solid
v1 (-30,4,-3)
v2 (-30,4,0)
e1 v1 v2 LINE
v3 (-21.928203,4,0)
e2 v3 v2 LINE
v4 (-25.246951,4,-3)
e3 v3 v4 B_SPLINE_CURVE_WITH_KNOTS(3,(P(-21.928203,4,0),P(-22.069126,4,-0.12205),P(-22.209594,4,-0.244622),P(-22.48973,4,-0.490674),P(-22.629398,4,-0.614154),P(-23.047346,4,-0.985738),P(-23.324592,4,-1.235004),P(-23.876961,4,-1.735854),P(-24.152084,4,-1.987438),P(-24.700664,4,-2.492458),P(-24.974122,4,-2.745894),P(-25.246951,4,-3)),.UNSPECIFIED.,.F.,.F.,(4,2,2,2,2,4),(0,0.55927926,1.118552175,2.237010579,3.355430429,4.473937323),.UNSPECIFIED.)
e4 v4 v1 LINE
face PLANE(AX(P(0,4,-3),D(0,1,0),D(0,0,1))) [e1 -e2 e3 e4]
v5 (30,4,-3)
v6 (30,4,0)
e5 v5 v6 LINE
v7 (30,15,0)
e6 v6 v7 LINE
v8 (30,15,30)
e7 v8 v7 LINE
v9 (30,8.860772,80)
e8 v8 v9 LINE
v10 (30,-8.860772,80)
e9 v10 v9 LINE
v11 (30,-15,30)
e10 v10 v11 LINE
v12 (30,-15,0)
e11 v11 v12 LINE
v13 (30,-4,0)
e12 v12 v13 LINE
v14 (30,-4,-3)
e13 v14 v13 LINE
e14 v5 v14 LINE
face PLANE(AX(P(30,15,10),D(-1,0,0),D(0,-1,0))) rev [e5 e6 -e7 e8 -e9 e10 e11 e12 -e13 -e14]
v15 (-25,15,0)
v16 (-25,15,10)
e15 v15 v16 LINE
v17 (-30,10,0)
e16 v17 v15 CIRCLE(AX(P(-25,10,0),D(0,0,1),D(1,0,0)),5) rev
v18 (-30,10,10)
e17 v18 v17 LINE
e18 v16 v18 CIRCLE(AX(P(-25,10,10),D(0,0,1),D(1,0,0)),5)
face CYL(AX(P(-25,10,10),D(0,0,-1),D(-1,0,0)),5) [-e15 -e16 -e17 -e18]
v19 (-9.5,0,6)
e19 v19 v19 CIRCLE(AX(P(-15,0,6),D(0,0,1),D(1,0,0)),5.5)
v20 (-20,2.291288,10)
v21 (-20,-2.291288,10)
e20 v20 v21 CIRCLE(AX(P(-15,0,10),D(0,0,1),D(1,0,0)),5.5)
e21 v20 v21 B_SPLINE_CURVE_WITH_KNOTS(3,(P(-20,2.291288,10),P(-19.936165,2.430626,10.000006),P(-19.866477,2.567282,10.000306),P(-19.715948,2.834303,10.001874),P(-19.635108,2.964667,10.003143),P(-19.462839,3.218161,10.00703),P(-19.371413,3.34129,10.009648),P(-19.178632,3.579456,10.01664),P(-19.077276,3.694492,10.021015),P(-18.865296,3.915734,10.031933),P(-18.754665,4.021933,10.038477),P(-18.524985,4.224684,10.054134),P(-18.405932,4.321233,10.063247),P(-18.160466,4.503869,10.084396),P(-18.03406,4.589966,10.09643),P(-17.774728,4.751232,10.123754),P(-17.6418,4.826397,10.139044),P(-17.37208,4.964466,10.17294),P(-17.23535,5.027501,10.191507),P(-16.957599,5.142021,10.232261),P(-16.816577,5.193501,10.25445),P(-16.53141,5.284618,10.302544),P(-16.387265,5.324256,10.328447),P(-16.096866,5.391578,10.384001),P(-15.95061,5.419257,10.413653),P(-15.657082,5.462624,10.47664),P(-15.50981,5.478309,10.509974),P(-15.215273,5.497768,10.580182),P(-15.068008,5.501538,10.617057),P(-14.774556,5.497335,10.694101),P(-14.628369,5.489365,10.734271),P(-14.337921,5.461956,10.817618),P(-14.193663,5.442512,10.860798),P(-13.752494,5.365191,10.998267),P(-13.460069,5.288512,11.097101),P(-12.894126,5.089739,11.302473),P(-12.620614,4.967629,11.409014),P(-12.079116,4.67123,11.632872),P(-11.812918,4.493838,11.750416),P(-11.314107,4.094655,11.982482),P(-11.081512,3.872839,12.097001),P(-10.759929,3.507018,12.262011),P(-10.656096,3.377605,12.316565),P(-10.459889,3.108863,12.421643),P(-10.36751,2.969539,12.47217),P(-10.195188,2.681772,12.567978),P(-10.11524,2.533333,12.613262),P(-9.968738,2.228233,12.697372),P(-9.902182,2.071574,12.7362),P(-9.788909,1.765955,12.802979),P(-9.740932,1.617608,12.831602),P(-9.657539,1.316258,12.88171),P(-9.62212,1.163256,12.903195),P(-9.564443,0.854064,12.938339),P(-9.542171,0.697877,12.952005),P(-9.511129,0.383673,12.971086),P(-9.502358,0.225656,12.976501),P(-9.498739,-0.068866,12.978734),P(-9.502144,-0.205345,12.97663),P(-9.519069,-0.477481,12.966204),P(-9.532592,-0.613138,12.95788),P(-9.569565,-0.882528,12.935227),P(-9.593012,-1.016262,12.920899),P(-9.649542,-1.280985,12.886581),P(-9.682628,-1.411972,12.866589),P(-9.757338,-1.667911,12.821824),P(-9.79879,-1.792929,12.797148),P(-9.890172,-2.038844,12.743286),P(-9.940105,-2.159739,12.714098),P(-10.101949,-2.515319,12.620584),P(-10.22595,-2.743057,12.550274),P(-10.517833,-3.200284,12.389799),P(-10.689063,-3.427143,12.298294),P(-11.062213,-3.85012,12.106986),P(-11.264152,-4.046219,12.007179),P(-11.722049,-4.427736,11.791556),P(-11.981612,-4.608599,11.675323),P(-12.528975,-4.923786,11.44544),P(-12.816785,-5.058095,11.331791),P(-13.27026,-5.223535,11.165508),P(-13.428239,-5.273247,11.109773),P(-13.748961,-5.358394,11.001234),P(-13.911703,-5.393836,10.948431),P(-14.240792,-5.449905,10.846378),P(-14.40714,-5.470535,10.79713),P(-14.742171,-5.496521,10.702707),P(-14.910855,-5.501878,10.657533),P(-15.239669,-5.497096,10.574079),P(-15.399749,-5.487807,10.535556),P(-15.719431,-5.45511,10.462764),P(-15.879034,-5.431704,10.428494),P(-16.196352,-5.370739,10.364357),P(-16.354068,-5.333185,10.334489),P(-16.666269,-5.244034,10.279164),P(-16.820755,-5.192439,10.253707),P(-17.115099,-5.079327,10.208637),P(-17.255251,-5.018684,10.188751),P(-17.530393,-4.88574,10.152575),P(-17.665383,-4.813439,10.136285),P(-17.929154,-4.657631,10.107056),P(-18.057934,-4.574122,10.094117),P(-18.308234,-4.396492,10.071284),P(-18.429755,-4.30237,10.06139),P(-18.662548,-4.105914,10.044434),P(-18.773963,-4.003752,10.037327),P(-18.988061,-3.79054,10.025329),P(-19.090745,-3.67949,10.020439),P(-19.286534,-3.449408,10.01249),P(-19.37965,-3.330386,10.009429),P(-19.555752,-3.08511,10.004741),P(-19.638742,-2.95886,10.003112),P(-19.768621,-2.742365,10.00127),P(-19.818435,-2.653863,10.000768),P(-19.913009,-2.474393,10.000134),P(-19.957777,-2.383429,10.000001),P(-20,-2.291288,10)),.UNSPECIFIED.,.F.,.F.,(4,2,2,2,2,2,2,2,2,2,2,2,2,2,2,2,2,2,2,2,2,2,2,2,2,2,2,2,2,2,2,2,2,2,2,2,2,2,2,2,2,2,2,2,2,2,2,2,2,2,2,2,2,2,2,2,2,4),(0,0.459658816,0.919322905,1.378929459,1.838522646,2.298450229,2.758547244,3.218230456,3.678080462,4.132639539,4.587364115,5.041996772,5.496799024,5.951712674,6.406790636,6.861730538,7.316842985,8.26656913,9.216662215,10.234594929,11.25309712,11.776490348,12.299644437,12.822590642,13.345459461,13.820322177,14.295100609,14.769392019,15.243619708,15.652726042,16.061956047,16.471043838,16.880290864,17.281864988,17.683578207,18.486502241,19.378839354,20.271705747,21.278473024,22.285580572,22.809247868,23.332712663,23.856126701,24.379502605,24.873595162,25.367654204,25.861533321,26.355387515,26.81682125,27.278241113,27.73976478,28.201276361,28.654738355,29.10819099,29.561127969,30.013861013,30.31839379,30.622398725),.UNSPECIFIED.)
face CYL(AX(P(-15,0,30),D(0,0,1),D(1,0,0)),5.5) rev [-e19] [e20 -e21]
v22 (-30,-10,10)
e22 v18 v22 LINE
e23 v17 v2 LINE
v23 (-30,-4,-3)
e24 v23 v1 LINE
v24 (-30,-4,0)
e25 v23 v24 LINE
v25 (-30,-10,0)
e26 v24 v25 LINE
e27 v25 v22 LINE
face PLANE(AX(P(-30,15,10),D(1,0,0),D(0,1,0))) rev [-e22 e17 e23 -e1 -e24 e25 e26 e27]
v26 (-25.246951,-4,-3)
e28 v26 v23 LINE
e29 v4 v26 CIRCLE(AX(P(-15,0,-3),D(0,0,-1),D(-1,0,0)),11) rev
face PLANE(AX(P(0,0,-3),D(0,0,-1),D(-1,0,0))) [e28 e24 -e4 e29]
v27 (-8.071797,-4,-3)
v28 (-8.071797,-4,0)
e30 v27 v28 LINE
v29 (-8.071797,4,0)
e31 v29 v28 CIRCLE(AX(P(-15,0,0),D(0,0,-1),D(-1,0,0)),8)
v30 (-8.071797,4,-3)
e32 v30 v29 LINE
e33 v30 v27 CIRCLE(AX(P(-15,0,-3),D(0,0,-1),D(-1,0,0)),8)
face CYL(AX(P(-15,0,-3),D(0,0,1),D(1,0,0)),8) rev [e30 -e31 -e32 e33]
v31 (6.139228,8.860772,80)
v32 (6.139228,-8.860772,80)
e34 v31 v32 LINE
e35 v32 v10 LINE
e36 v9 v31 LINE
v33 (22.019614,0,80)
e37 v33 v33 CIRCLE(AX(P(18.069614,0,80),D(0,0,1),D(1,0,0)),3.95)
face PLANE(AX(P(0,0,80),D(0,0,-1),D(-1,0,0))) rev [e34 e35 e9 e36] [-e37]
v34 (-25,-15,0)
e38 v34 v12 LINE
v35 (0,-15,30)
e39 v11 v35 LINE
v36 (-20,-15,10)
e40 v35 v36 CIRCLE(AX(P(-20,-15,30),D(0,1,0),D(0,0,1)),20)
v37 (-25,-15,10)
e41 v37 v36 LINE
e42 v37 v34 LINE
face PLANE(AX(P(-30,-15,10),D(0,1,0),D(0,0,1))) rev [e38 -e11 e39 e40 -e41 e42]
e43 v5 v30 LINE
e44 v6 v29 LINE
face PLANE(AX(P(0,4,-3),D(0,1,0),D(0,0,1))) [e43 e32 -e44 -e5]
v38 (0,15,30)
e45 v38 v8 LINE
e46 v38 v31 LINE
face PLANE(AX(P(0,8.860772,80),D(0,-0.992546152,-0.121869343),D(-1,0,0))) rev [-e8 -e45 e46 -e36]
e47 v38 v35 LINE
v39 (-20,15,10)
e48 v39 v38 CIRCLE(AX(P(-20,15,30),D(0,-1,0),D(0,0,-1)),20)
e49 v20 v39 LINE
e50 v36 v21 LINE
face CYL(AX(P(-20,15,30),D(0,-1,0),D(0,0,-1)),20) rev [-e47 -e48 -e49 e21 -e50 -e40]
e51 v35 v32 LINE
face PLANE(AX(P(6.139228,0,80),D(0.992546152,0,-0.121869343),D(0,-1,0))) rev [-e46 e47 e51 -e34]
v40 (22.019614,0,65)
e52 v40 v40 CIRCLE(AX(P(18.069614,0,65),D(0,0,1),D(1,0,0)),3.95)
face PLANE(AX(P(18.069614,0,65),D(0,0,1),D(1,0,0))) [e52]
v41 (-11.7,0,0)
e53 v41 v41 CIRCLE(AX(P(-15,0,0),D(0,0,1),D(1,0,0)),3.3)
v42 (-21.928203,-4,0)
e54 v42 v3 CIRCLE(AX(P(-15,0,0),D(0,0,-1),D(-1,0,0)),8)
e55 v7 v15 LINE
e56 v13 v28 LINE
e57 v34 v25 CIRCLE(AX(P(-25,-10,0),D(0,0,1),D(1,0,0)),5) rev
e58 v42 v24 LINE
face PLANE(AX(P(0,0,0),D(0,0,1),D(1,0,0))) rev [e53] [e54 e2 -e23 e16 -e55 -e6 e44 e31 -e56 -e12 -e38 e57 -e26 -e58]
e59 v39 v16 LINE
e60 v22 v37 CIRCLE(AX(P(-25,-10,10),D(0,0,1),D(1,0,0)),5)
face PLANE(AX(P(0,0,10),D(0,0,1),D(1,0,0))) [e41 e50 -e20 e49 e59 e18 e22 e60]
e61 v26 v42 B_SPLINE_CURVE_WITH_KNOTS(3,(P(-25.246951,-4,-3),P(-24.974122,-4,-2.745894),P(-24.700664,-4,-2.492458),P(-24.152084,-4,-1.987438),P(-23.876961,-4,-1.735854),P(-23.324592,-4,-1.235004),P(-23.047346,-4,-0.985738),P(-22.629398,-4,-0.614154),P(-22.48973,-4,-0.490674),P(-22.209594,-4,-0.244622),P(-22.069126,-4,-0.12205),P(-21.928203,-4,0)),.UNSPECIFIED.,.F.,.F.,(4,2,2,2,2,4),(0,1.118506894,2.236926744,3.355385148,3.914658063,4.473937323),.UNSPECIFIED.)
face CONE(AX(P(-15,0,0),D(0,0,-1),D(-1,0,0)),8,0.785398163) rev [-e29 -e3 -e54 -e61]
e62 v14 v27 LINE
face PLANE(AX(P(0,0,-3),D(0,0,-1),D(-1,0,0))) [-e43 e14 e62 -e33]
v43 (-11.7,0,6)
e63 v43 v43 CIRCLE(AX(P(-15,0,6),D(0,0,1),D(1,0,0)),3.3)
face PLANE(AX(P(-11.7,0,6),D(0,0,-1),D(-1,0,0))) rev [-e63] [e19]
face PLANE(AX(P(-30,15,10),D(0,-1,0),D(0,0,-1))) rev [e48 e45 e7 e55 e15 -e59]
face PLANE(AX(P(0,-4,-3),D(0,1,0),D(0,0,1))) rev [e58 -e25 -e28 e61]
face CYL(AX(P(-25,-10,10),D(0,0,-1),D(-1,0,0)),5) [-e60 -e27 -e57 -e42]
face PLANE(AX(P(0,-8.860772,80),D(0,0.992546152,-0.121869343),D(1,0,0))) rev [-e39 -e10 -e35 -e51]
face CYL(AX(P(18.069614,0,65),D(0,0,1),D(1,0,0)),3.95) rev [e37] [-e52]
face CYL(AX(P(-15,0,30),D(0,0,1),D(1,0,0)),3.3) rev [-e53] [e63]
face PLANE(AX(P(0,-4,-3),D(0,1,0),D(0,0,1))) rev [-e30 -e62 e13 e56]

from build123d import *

# Parameters (mm, degrees)
BASE_DEPTH                    = 10
TOWER_SKETCH_W                = 29.999999999999996
TOWER_SKETCH_H                = 30
TOWER_DEPTH                   = 70
BASE_RADIUS_R                 = 20
BASE_SCREW_D                  = 6.6
BASE_SCREW_CBORE_D            = 11
BASE_SCREW_CBORE_DEPTH        = 24
TOWER_BEVEL_SIZE              = 50
TOWER_BEVEL_SIZE_2            = 6.139228045
TOP_COVER_SCREW_HOLE_SKETCH_R = 3.950000000000002
COVER_SREW_HOLE_DEPTH         = 15
P_IDAT_VYSUNUT_M3_DEPTH       = 3
PROFILE_BEVEL_SIZE            = 3
ROUNDING_R                    = 5


# Some blends are built 0.0001 mm under size
with BuildPart() as part:
    # Base sketch → Base (new body)
    with BuildSketch(Plane.XY):
        Polygon((-30.000000000000007, 15.000000000000002), (29.999999999999986, 15.000000000000002), (29.999999999999993, -14.999999999999998), (-30, -14.999999999999998), align=None)
    extrude(amount=BASE_DEPTH)

    # Tower sketch → Tower (add)
    with BuildSketch(Plane.XY.offset(10)):
        with Locations((14.999999999999988, 1.78e-15)):
            Rectangle(TOWER_SKETCH_W, TOWER_SKETCH_H)
    extrude(amount=TOWER_DEPTH)

    # Base radius
    base_radius_edges = [part.edges().sort_by_distance(p)[0] for p in [
        (-1.041e-14, 1.78e-15, 10),
    ]]
    fillet(base_radius_edges, radius=BASE_RADIUS_R)

    # Base screw (through all)
    with Locations(Plane.XY.offset(30)):
        with Locations((-15, 0)):
            CounterBoreHole(BASE_SCREW_D / 2, BASE_SCREW_CBORE_D / 2, BASE_SCREW_CBORE_DEPTH)

    # tower bevel
    # the kernel refuses this chamfer: 50, 6.139228045 mm, written as the material it takes off along each edge
    with BuildSketch(Plane(origin=(159.96415924997035, 15.000000000000002, 80), x_dir=(0, 0.004688575069790863, -0.9999890085715016), z_dir=(-1, 0, 0))) as tower_bevel_piece_1:
        Polygon((TOWER_BEVEL_SIZE * 0.999989008572, TOWER_BEVEL_SIZE * 0.00468857506979), (-TOWER_BEVEL_SIZE_2 * 0.0046885750699, TOWER_BEVEL_SIZE_2 * 0.999989008595), (0, 0), align=None)
    extrude(amount=289.9283184999407, mode=Mode.SUBTRACT)
    with BuildSketch(Plane(origin=(-1.041e-14, 144.96415924997035, 80), x_dir=(-0.00468857506979085, 0, -0.9999890085715016), z_dir=(0, -1, 0))) as tower_bevel_piece_2:
        Polygon((TOWER_BEVEL_SIZE * 0.999989008572, TOWER_BEVEL_SIZE * 0.00468857506979), (-TOWER_BEVEL_SIZE_2 * 0.0046885750699, TOWER_BEVEL_SIZE_2 * 0.999989008595), (0, 0), align=None)
    extrude(amount=289.9283184999407, mode=Mode.SUBTRACT)
    with BuildSketch(Plane(origin=(-129.96415924997035, -14.999999999999998, 80), x_dir=(0, 0.9548873060039238, 0.2969684037613576), z_dir=(1, 0, 0))) as tower_bevel_piece_3:
        Polygon((TOWER_BEVEL_SIZE_2 * 0.954887306027, -TOWER_BEVEL_SIZE_2 * 0.296968403768), (-TOWER_BEVEL_SIZE * 0.296968403761, -TOWER_BEVEL_SIZE * 0.954887306004), (0, 0), align=None)
    extrude(amount=289.9283184999407, mode=Mode.SUBTRACT)

    # Top cover screw hole sketch → Cover srew hole (cut)
    with BuildSketch(Plane.XY.offset(80)):
        with Locations((18.06961402257261, 2.6e-15)):
            Circle(TOP_COVER_SCREW_HOLE_SKETCH_R)
    extrude(amount=-COVER_SREW_HOLE_DEPTH, mode=Mode.SUBTRACT)

    # profile sketch → Přidat vysunutím3 (add)
    with BuildSketch(Plane(origin=(0, 0, 0), x_dir=(-1, 0, 0), z_dir=(0, 0, -1))):
        with BuildLine():
            Line((8.071796769724529, 4), (-30, 4))
            Line((-30, 4), (-30, -4))
            Line((-30, -4), (8.071796769724536, -4))
            ThreePointArc((8.071796769724518, -4.000000000000045), (7.000000000000002, 9.8e-16), (8.071796769724518, 4.0000000000000435))
        make_face()
        with BuildLine():
            Line((30.000000000000007, 4), (21.928203230275386, 4))
            ThreePointArc((21.928203230275436, 4.0000000000001386), (22.72740661031253, 2.070552360820243), (23.000000000000007, 0))
            ThreePointArc((23.000000000000007, -1.96e-15), (22.72740661031253, -2.0705523608202414), (21.928203230275436, -4.000000000000134))
            Line((21.928203230275393, -4), (30.000000000000007, -4))
            Line((30.000000000000007, -4), (30.000000000000007, 4))
        make_face()
    extrude(amount=P_IDAT_VYSUNUT_M3_DEPTH)

    # Profile bevel
    profile_bevel_edges = [part.edges().sort_by_distance(p)[0] for p in [
        (-23.000000000000007, 3.22e-15, -3),
    ]]
    chamfer(profile_bevel_edges, length=PROFILE_BEVEL_SIZE - 0.0001)  # a hair under: the kernel refuses the full size

    # rounding
    rounding_edges = [part.edges().sort_by_distance(p)[0] for p in [
        (-30, -14.999999999999998, 5),
        (-30.000000000000007, 15.000000000000002, 5),
    ]]
    fillet(rounding_edges, radius=ROUNDING_R)


solid = part.part
